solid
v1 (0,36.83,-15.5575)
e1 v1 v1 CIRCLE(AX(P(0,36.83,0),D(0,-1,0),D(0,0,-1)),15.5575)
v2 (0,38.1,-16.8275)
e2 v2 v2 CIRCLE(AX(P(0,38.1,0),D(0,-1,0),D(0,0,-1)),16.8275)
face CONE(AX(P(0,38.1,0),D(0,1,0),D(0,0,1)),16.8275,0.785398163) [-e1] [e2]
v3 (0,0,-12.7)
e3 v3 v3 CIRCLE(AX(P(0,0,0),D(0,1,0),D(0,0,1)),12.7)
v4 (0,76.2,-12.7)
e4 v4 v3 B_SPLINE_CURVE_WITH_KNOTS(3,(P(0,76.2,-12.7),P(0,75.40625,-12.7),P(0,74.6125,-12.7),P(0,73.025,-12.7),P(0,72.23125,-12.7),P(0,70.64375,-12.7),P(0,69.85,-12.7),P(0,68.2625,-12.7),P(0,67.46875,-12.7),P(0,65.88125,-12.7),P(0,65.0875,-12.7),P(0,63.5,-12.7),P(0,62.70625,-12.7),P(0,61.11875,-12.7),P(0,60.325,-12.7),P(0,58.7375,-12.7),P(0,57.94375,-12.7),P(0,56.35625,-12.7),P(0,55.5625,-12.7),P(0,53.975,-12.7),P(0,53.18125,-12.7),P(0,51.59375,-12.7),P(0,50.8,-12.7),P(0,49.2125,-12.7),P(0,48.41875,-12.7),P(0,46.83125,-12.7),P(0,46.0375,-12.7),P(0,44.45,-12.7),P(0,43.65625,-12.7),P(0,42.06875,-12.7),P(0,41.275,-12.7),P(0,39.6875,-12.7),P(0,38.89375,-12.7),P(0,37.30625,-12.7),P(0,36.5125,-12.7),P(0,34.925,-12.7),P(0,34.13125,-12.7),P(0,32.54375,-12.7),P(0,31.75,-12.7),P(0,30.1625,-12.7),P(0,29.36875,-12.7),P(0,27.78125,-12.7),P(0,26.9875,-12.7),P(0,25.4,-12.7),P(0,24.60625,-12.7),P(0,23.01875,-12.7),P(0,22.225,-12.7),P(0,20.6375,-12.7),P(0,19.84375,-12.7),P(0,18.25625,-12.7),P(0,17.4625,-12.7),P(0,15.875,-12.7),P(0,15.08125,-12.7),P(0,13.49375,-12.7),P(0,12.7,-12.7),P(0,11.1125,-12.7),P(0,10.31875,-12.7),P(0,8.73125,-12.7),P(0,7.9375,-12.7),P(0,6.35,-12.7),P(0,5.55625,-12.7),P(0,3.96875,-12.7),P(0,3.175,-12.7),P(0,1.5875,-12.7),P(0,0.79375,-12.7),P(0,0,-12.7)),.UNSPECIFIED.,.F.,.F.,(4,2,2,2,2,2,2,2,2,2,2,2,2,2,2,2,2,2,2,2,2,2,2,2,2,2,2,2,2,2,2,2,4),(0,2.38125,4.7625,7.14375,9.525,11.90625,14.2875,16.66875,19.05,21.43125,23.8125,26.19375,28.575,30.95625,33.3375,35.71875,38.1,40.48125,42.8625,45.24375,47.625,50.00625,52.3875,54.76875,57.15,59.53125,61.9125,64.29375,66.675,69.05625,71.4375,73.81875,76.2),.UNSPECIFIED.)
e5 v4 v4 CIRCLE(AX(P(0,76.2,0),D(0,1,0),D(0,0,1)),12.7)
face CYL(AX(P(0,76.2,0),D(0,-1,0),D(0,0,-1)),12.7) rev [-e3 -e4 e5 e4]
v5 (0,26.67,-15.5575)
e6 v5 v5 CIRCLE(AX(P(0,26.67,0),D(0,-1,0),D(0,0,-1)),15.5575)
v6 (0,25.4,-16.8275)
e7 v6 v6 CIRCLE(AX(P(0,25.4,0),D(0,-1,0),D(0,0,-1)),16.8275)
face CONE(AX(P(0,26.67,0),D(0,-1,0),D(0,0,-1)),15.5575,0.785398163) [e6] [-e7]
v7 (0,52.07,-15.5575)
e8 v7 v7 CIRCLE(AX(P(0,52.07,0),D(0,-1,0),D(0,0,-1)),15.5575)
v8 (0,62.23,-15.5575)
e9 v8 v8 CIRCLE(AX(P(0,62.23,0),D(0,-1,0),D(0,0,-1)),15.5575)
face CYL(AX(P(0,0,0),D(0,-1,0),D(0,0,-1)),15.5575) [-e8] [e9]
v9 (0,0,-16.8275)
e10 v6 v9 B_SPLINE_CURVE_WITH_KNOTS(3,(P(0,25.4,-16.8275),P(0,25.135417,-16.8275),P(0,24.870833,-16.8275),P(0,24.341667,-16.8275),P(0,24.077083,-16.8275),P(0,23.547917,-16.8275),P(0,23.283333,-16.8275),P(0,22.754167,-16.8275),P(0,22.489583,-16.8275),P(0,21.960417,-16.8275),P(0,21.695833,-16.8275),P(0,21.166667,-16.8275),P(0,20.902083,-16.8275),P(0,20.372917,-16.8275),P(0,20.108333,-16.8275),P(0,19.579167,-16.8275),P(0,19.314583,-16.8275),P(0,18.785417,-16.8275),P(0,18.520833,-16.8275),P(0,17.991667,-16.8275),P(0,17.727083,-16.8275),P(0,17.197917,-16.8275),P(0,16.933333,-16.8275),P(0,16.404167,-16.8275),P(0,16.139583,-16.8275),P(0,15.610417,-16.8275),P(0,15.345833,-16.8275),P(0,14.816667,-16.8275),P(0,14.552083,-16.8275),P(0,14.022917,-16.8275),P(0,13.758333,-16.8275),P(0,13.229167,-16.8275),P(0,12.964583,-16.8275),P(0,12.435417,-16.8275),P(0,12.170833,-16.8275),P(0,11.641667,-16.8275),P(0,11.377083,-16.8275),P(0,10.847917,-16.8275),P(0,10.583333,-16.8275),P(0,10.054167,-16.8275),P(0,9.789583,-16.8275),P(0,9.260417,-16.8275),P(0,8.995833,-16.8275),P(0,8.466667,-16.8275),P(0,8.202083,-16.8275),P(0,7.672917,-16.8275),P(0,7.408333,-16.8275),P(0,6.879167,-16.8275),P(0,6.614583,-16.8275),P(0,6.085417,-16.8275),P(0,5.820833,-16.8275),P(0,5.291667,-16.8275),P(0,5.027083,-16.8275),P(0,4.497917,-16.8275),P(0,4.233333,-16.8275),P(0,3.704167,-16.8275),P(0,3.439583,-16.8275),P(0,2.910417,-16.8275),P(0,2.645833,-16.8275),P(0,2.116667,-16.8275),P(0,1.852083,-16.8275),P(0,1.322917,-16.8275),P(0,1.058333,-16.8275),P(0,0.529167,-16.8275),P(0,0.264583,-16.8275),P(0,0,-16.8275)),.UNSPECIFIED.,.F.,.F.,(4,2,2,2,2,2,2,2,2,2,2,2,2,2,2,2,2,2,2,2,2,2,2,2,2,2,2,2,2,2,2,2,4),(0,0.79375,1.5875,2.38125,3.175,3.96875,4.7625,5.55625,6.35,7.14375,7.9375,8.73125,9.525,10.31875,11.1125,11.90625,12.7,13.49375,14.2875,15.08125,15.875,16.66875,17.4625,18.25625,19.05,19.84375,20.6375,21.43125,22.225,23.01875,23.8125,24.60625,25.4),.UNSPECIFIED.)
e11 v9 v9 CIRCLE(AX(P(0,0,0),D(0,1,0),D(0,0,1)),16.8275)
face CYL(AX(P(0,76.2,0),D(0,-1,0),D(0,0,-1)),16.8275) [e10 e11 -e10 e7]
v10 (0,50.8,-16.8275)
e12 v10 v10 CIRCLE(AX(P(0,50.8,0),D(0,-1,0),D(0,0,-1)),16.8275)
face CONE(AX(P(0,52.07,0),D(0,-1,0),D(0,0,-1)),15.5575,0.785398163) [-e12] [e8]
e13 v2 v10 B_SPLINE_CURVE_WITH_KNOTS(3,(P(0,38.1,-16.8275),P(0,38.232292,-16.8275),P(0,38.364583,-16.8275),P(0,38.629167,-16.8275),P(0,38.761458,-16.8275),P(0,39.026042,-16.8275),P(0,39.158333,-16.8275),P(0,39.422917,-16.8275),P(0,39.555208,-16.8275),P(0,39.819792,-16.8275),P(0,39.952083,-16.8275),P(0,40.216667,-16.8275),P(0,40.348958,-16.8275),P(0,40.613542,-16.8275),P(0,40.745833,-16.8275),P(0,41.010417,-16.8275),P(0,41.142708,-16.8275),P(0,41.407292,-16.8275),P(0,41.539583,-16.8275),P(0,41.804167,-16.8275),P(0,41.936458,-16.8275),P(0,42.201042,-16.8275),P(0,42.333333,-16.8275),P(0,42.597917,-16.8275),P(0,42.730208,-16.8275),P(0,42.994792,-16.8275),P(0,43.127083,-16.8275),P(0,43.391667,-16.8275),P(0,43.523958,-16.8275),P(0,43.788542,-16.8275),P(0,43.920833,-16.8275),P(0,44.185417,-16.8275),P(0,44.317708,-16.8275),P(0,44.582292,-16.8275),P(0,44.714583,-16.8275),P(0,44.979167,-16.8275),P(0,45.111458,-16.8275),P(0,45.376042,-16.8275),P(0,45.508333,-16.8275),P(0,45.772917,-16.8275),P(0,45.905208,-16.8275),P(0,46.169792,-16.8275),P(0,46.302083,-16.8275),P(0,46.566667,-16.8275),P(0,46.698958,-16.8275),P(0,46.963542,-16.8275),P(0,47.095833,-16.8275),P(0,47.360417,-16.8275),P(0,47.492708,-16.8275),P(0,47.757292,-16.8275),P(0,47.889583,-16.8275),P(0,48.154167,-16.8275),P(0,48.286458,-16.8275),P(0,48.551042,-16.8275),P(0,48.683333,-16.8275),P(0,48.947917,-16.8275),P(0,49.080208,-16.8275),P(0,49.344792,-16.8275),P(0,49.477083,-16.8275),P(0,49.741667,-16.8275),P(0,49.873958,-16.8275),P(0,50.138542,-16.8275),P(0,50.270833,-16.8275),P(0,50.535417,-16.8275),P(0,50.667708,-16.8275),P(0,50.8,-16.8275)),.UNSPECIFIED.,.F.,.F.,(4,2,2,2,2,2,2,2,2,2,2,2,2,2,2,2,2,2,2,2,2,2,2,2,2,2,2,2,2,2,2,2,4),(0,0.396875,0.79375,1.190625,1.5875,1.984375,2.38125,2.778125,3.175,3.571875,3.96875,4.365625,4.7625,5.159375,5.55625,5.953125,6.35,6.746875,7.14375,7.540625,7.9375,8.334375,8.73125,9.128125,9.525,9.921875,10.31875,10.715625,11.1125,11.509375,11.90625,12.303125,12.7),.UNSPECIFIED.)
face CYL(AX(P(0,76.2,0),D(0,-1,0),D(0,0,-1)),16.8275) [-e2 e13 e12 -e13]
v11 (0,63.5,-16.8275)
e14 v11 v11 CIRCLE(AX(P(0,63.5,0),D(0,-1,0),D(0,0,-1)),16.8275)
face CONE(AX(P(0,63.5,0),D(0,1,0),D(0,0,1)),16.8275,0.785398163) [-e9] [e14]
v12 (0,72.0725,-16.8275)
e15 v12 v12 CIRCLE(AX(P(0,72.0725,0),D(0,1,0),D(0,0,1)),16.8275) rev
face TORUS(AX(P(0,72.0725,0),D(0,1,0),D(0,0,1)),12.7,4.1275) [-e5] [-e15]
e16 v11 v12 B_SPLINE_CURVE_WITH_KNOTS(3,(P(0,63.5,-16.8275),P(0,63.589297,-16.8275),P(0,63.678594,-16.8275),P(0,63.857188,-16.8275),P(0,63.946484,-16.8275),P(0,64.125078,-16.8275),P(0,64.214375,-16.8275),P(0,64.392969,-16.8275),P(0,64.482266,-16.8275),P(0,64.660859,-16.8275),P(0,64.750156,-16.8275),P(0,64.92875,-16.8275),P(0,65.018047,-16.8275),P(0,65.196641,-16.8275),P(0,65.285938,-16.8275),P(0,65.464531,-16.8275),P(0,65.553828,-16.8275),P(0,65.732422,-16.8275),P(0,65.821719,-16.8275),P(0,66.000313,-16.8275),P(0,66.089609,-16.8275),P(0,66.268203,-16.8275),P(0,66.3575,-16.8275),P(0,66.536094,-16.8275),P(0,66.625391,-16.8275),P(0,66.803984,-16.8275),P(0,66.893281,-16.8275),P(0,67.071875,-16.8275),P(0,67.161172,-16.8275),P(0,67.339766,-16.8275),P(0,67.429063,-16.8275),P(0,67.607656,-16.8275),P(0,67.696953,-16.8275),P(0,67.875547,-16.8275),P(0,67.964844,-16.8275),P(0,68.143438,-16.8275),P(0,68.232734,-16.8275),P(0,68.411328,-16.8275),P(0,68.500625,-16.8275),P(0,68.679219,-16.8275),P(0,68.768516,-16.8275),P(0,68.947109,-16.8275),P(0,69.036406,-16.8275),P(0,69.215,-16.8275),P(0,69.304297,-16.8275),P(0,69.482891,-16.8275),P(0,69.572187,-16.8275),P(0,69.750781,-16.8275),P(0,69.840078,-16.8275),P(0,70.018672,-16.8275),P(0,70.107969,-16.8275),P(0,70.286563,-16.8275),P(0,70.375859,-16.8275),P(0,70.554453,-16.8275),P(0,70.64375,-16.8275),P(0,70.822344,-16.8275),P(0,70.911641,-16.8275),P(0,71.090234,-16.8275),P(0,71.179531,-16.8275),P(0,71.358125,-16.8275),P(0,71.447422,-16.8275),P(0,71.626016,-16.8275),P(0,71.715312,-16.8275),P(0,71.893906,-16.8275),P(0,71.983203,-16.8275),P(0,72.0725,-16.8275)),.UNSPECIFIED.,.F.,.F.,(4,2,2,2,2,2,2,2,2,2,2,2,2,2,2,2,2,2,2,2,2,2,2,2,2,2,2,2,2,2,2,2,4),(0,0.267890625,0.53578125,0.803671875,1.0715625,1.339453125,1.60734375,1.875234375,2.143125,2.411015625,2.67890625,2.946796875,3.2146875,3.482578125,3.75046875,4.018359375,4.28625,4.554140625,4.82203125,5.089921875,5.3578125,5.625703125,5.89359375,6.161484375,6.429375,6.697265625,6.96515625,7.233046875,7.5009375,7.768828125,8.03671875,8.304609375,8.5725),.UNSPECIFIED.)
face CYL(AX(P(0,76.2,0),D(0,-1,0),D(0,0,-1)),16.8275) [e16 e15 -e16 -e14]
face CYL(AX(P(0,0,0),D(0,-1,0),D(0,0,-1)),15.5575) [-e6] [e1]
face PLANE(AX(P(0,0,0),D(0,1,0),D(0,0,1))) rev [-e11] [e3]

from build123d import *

# Parameters (mm, degrees)
SKETCH1_R           = 16.8275
SKETCH1_R_2         = 12.7
BOSS_EXTRUDE1_DEPTH = 76.2
FILLET1_R           = 4.1275


with BuildPart() as part:
    # Sketch1 → Boss-Extrude1 (new body)
    with BuildSketch(Plane(origin=(0, 0, 0), x_dir=(1, 0, 0), z_dir=(0, 1, 0))):
        with Locations(Location((0, 0, 0), (0, 0, 90))):
            Circle(SKETCH1_R)
        with Locations(Location((0, 0, 0), (0, 0, 90))):
            Circle(SKETCH1_R_2, mode=Mode.SUBTRACT)
    extrude(amount=BOSS_EXTRUDE1_DEPTH)

    # Fillet1
    fillet1_edges = [part.edges().sort_by_distance(p)[0] for p in [
        (0, 76.2, 16.8275),
    ]]
    fillet(fillet1_edges, radius=FILLET1_R - 0.0001)  # a hair under: the kernel refuses the full size

    # Sketch2 → Cut-Revolve1 (revolve, cut)
    with BuildSketch(Plane.XY, mode=Mode.PRIVATE) as cut_revolve1_sk:
        Polygon((16.8275, 63.5), (15.5575, 62.23), (15.5575, 52.07), (16.8275, 50.8), align=None)
        Polygon((16.8275, 38.1), (15.5575, 36.83), (15.5575, 26.67), (16.8275, 25.4), align=None)
    revolve(cut_revolve1_sk.sketch.rotate(Axis((0, 0, 0), (0, 1, 0)), 90), axis=Axis((0, 0, 0), (0, 1, 0)), mode=Mode.SUBTRACT)


solid = part.part
